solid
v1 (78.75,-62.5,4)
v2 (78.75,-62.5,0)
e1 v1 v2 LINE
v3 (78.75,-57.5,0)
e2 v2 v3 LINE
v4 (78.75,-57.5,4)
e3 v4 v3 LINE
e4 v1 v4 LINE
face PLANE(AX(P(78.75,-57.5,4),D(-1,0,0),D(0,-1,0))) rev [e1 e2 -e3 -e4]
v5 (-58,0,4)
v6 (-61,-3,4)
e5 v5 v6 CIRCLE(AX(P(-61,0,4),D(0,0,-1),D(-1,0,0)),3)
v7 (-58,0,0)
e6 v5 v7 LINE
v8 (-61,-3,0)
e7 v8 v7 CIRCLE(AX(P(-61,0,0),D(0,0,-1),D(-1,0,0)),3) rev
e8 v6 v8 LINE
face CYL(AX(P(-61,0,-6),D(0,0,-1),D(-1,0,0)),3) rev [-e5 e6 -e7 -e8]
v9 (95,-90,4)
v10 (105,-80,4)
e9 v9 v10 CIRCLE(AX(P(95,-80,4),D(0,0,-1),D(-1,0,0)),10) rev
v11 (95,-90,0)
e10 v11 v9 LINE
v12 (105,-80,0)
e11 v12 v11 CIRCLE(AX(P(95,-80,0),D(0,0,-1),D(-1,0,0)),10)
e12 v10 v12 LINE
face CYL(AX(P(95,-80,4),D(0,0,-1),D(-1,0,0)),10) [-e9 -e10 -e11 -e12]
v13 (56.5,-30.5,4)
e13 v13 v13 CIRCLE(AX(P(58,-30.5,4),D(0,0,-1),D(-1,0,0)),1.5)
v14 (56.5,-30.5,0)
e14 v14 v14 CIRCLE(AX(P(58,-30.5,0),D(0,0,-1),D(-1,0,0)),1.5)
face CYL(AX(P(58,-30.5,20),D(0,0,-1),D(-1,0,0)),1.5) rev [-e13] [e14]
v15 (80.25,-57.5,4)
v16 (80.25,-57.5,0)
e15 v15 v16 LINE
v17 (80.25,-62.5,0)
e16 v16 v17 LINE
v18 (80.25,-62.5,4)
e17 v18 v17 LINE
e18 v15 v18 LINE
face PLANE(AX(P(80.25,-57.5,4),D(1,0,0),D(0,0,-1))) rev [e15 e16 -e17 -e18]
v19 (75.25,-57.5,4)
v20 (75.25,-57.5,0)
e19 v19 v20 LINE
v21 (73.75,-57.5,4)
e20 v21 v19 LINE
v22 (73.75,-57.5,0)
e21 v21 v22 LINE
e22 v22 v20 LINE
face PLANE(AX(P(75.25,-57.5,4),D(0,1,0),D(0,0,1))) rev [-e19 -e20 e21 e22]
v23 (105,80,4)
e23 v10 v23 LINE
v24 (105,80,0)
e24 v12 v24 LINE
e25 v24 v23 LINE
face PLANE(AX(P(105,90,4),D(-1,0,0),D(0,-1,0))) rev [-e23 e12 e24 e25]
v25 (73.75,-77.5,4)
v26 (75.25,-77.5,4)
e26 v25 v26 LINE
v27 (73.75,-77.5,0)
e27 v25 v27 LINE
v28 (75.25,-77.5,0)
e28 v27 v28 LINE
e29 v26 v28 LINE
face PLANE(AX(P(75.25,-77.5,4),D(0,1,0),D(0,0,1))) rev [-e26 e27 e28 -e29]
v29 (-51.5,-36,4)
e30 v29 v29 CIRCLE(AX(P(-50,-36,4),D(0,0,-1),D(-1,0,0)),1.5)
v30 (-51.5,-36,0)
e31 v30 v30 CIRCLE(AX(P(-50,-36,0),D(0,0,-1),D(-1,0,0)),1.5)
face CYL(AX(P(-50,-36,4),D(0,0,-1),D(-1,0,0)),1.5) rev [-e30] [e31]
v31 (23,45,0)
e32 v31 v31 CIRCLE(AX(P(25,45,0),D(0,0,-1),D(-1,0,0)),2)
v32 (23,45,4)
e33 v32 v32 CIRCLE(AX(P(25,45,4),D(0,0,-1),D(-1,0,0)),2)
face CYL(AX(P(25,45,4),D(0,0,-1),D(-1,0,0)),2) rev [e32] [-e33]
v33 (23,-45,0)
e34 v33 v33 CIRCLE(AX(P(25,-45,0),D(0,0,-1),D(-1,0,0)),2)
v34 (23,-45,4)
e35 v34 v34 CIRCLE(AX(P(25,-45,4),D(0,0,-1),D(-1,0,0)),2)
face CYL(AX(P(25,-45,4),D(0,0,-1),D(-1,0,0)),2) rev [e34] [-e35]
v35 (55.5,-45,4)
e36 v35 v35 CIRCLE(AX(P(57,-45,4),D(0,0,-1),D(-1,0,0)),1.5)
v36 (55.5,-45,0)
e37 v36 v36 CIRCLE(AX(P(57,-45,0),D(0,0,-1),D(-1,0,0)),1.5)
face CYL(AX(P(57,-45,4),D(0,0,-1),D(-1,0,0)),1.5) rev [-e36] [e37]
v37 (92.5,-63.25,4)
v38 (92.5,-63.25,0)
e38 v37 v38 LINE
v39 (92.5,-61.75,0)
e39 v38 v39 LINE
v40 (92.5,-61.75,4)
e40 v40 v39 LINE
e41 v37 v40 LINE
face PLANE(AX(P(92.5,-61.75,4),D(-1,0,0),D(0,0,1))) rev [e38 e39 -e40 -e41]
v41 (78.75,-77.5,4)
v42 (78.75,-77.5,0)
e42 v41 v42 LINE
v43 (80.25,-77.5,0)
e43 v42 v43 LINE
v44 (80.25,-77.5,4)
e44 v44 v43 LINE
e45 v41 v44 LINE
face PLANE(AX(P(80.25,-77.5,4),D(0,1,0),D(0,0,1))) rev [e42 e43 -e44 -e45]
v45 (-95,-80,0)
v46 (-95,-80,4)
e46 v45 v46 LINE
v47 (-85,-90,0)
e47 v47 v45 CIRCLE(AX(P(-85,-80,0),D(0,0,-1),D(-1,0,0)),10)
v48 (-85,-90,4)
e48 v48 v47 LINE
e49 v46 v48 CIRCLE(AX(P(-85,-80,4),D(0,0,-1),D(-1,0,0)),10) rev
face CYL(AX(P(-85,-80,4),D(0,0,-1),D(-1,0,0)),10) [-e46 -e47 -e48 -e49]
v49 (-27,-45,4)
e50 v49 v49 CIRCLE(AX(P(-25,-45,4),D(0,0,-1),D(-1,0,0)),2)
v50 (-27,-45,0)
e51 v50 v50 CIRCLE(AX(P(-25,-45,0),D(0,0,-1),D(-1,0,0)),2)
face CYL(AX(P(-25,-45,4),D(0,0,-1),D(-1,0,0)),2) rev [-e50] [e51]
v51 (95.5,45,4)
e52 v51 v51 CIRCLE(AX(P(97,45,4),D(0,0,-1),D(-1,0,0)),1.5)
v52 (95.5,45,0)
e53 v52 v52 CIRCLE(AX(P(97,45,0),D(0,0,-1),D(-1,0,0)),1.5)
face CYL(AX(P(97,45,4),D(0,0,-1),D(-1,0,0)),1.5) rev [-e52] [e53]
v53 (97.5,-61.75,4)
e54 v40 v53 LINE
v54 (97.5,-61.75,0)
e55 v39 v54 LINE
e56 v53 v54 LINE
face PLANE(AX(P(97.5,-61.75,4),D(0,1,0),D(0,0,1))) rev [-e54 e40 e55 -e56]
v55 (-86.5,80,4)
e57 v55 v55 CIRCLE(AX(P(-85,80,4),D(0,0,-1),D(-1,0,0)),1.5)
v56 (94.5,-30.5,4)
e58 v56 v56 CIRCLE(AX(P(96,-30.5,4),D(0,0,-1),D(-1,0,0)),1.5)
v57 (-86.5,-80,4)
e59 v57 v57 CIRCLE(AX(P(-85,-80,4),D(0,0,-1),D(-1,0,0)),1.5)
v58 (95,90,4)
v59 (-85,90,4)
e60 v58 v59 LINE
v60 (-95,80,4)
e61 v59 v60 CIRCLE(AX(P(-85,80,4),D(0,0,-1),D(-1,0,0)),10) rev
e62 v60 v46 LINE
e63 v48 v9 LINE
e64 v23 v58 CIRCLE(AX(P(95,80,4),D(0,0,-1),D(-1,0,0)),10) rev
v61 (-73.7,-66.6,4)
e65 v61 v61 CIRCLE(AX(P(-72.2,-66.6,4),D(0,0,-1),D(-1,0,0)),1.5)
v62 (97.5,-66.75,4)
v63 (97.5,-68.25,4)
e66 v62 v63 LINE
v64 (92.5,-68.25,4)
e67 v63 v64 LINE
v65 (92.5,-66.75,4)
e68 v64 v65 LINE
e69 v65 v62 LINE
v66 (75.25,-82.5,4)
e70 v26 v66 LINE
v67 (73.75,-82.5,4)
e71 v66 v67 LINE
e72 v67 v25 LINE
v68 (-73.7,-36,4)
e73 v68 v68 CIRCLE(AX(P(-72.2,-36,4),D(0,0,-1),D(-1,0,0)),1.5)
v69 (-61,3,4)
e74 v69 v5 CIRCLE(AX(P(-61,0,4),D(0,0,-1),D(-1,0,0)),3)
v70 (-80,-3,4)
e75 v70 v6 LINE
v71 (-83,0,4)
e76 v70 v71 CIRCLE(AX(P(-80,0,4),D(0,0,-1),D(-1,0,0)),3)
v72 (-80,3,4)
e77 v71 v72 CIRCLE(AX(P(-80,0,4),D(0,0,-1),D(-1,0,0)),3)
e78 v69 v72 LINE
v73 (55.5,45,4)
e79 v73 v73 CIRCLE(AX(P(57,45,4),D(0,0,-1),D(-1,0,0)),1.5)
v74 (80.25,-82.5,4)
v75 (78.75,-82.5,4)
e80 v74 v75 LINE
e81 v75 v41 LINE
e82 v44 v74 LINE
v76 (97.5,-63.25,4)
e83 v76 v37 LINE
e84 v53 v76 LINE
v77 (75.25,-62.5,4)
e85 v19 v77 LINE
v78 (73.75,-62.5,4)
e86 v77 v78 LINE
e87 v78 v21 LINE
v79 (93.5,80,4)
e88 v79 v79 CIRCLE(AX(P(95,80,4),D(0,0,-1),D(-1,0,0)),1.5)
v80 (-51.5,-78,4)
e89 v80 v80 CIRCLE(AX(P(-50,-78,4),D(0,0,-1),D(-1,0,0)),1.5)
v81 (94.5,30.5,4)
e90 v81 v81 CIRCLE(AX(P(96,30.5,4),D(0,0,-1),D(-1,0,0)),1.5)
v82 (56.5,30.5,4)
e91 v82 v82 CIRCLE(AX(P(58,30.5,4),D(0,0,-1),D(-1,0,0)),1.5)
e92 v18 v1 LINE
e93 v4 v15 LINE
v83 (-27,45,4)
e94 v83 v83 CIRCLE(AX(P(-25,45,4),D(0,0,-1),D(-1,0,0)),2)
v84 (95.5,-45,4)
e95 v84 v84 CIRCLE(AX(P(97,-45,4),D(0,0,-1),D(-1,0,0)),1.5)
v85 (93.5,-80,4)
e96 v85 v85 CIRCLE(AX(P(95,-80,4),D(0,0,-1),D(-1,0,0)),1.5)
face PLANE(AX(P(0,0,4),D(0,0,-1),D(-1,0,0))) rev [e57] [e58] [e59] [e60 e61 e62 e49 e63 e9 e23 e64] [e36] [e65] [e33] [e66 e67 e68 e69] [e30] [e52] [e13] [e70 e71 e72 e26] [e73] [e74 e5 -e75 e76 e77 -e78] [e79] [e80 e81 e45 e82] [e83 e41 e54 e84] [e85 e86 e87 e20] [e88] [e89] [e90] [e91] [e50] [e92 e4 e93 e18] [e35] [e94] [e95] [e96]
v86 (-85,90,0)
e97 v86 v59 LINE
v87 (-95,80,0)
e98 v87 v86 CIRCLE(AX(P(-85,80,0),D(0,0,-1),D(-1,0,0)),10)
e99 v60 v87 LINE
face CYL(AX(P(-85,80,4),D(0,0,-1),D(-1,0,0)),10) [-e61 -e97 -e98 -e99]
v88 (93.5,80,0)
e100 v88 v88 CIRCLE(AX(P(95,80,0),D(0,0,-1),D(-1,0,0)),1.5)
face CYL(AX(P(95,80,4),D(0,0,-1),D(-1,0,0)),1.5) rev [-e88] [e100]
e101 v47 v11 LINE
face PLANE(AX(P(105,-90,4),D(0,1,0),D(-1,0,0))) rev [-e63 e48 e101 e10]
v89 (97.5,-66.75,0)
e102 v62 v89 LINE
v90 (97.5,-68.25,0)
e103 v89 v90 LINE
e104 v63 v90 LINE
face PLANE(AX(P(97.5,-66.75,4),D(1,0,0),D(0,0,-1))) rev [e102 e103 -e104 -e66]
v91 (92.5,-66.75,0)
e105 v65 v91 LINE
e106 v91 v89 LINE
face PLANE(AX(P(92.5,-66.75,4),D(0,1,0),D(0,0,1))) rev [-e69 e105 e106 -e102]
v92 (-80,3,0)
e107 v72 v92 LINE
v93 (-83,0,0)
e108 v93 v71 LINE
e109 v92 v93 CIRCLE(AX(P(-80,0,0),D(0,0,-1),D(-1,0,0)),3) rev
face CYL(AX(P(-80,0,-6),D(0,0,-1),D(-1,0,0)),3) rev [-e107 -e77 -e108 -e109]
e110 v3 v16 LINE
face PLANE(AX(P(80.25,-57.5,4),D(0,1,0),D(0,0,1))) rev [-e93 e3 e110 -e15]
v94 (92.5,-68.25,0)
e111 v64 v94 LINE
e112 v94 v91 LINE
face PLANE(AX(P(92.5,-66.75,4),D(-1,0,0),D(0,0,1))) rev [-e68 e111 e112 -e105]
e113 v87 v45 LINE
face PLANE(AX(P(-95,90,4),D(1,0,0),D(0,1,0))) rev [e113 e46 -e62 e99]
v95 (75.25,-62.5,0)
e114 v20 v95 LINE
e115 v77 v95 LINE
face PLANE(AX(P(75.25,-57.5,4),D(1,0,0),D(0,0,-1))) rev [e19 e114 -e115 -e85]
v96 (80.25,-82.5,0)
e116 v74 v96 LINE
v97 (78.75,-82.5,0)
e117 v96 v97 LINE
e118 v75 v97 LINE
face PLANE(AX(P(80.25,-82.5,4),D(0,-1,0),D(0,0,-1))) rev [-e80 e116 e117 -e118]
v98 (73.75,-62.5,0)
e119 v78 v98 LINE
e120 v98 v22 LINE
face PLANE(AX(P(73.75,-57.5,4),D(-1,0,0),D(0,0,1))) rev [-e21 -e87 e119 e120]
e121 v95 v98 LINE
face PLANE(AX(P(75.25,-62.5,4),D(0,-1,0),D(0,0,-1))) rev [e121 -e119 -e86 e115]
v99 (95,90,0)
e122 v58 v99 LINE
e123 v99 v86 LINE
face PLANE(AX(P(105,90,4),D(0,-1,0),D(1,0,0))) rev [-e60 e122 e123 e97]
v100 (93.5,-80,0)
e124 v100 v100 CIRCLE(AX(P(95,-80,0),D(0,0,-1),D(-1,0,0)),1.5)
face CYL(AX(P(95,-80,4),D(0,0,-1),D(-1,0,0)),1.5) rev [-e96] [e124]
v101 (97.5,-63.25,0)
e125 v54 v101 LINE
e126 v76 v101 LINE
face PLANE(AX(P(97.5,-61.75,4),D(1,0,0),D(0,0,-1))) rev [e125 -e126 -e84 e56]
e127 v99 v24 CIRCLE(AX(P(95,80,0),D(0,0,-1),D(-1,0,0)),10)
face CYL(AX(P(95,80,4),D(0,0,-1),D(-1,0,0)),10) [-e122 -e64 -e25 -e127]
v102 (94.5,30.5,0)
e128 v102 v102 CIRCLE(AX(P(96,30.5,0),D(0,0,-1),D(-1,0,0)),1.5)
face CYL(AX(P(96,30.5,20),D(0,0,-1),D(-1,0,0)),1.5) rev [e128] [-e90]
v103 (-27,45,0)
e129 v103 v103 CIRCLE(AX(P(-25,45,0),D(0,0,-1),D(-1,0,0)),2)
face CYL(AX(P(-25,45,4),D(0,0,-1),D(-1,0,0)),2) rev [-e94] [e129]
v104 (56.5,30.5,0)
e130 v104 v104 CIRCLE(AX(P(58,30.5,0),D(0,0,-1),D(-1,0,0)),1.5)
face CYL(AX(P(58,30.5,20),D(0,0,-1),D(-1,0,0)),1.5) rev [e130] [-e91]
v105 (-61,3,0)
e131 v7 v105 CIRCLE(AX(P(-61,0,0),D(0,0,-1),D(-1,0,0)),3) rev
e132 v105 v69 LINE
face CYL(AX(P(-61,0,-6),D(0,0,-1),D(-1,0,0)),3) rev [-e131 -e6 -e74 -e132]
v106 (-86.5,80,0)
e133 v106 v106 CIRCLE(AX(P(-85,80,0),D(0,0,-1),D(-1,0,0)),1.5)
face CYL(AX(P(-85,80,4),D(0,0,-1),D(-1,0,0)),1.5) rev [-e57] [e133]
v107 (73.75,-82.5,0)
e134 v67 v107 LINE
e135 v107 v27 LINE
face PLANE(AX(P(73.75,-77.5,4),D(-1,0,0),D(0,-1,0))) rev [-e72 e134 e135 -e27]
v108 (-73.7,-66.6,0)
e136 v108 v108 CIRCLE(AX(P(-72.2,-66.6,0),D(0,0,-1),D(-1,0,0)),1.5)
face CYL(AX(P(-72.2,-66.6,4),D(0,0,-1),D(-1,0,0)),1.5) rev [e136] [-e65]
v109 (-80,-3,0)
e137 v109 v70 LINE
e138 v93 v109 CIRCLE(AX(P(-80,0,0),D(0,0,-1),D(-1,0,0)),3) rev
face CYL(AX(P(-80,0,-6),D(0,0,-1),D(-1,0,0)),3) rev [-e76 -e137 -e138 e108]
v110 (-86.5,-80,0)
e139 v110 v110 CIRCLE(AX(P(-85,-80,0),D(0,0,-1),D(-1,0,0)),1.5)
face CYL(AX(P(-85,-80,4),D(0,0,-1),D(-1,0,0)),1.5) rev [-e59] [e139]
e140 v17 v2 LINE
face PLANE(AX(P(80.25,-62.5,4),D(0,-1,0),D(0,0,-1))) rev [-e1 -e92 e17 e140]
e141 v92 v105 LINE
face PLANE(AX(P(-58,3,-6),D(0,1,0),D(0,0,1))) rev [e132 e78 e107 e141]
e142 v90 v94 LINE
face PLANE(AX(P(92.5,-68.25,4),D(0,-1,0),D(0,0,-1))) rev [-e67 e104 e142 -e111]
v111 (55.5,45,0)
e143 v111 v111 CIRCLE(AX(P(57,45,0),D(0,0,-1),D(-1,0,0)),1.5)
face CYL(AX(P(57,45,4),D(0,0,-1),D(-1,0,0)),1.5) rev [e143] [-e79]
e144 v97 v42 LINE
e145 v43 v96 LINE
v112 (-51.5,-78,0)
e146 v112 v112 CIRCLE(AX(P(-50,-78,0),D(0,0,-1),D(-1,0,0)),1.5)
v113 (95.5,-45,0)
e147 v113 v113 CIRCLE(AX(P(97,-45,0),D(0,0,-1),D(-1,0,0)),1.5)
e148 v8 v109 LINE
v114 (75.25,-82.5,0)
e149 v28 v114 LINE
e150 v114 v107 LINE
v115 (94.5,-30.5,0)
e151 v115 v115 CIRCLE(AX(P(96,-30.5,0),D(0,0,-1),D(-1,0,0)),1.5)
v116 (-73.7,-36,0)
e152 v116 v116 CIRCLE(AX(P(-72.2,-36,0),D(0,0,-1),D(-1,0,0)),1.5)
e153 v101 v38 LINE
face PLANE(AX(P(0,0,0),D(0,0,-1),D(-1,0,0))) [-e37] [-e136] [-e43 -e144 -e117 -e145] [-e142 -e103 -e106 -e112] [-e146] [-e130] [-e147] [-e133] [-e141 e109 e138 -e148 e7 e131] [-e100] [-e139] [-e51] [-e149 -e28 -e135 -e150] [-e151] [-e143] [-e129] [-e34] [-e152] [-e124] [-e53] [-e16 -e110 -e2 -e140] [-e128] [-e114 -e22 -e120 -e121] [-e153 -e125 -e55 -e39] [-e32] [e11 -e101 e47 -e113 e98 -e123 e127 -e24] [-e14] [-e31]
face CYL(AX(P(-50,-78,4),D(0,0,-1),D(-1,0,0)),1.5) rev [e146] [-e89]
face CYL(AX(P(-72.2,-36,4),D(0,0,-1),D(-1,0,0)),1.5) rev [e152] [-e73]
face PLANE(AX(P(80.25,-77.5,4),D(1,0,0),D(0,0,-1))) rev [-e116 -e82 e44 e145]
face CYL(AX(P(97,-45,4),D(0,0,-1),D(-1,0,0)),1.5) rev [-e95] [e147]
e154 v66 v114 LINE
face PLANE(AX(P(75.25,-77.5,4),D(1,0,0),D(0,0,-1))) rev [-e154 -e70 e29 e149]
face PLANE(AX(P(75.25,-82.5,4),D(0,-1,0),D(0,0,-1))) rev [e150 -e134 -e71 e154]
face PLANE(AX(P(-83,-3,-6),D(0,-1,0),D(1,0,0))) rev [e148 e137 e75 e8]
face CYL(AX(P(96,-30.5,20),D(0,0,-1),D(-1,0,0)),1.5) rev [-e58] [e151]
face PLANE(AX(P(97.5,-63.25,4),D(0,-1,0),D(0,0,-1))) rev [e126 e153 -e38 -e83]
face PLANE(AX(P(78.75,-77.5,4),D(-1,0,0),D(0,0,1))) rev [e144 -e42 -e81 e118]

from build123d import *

# Parameters (mm, degrees)
SKETCH1_W           = 200.000000134
SKETCH1_H           = 180
BOSS_EXTRUDE1_DEPTH = 4
SKETCH2_R           = 2
CUT_EXTRUDE1_DEPTH  = 139.351002938
FILLET1_R           = 10
SKETCH4_R           = 1.5
CUT_EXTRUDE3_DEPTH  = 20
SKETCH5_R           = 1.5
CUT_EXTRUDE4_DEPTH  = 139.351002938
SKETCH6_W           = 1.5
SKETCH6_H           = 5
SKETCH6_W_2         = 5
SKETCH6_H_2         = 1.5
CUT_EXTRUDE5_DEPTH  = 139.351002938
SKETCH7_R           = 1.5
CUT_EXTRUDE6_DEPTH  = 139.351002938
SKETCH8_R           = 1.5
CUT_EXTRUDE7_DEPTH  = 139.351002938
SKETCH9_W           = 25
SKETCH9_H           = 6
CUT_EXTRUDE8_DEPTH  = 10
FILLET2_R           = 3


with BuildPart() as part:
    # Sketch1 → Boss-Extrude1 (new body)
    with BuildSketch(Plane.XY):
        with Locations((5, 0)):
            Rectangle(SKETCH1_W, SKETCH1_H)
    extrude(amount=BOSS_EXTRUDE1_DEPTH)

    # Sketch2 → Cut-Extrude1 (cut, through all)
    with BuildSketch(Plane(origin=(0, 0, 0), x_dir=(-1, 0, 0), z_dir=(0, 0, -1))):
        with Locations((25, 45)):
            Circle(SKETCH2_R)
        with Locations((-25, 45)):
            Circle(SKETCH2_R)
        with Locations((-25, -45)):
            Circle(SKETCH2_R)
        with Locations((25, -45)):
            Circle(SKETCH2_R)
    extrude(amount=-CUT_EXTRUDE1_DEPTH, mode=Mode.SUBTRACT)

    # Fillet1
    fillet1_edges = [part.edges().sort_by_distance(p)[0] for p in [
        (-95.000000067, 90, 2),
        (105.000000067, 90, 2),
        (105.000000067, -90, 2),
        (-95.000000067, -90, 2),
    ]]
    fillet(fillet1_edges, radius=FILLET1_R)

    # Sketch4 → Cut-Extrude3 (cut)
    with BuildSketch(Plane(origin=(0, 0, 0), x_dir=(-1, 0, 0), z_dir=(0, 0, -1))):
        with Locations((-96.000000067, 30.5)):
            Circle(SKETCH4_R)
        with Locations((-58.000000067, 30.5)):
            Circle(SKETCH4_R)
        with Locations((-96.000000067, -30.5)):
            Circle(SKETCH4_R)
        with Locations((-58.000000067, -30.5)):
            Circle(SKETCH4_R)
    extrude(amount=-CUT_EXTRUDE3_DEPTH, mode=Mode.SUBTRACT)

    # Sketch5 → Cut-Extrude4 (cut, through all)
    with BuildSketch(Plane(origin=(0, 0, 0), x_dir=(-1, 0, 0), z_dir=(0, 0, -1))):
        with Locations((-57.000000067, 45)):
            Circle(SKETCH5_R)
        with Locations((-97.000000067, 45)):
            Circle(SKETCH5_R)
        with Locations((-97.000000067, -45)):
            Circle(SKETCH5_R)
        with Locations((-57.000000067, -45)):
            Circle(SKETCH5_R)
    extrude(amount=-CUT_EXTRUDE4_DEPTH, mode=Mode.SUBTRACT)

    # Sketch6 → Cut-Extrude5 (cut, through all)
    with BuildSketch(Plane(origin=(0, 0, 0), x_dir=(-1, 0, 0), z_dir=(0, 0, -1))):
        with Locations((-74.500000067, -60)):
            Rectangle(SKETCH6_W, SKETCH6_H)
        with Locations((-79.500000067, -60)):
            Rectangle(SKETCH6_W, SKETCH6_H)
        with Locations((-74.500000067, -80)):
            Rectangle(SKETCH6_W, SKETCH6_H)
        with Locations((-79.500000067, -80)):
            Rectangle(SKETCH6_W, SKETCH6_H)
        with Locations((-95.000000067, -67.5)):
            Rectangle(SKETCH6_W_2, SKETCH6_H_2)
        with Locations((-95.000000067, -62.5)):
            Rectangle(SKETCH6_W_2, SKETCH6_H_2)
    extrude(amount=-CUT_EXTRUDE5_DEPTH, mode=Mode.SUBTRACT)

    # Sketch7 → Cut-Extrude6 (cut, through all)
    with BuildSketch(Plane(origin=(0, 0, 0), x_dir=(-1, 0, 0), z_dir=(0, 0, -1))):
        with Locations((85.000000067, 80)):
            Circle(SKETCH7_R)
        with Locations((85.000000067, -80)):
            Circle(SKETCH7_R)
        with Locations((-95.000000067, -80)):
            Circle(SKETCH7_R)
        with Locations((-95.000000067, 80)):
            Circle(SKETCH7_R)
    extrude(amount=-CUT_EXTRUDE6_DEPTH, mode=Mode.SUBTRACT)

    # Sketch8 → Cut-Extrude7 (cut, through all)
    with BuildSketch(Plane(origin=(0, 0, 0), x_dir=(-1, 0, 0), z_dir=(0, 0, -1))):
        with Locations((50.000000067, -78)):
            Circle(SKETCH8_R)
        with Locations((72.200000067, -66.6)):
            Circle(SKETCH8_R)
        with Locations((72.200000067, -36)):
            Circle(SKETCH8_R)
        with Locations((50.000000067, -36)):
            Circle(SKETCH8_R)
    extrude(amount=-CUT_EXTRUDE7_DEPTH, mode=Mode.SUBTRACT)

    # Sketch9 → Cut-Extrude8 (cut)
    with BuildSketch(Plane.XY.offset(4)):
        with Locations((-70.500000067, 0)):
            Rectangle(SKETCH9_W, SKETCH9_H)
    extrude(amount=-CUT_EXTRUDE8_DEPTH, mode=Mode.SUBTRACT)

    # Fillet2
    fillet2_edges = [part.edges().sort_by_distance(p)[0] for p in [
        (-58.000000067, -3, 2),
        (-58.000000067, 3, 2),
        (-83.000000067, -3, 2),
        (-83.000000067, 3, 2),
    ]]
    fillet(fillet2_edges, radius=FILLET2_R - 0.0001)  # a hair under: the kernel refuses the full size


solid = part.part
